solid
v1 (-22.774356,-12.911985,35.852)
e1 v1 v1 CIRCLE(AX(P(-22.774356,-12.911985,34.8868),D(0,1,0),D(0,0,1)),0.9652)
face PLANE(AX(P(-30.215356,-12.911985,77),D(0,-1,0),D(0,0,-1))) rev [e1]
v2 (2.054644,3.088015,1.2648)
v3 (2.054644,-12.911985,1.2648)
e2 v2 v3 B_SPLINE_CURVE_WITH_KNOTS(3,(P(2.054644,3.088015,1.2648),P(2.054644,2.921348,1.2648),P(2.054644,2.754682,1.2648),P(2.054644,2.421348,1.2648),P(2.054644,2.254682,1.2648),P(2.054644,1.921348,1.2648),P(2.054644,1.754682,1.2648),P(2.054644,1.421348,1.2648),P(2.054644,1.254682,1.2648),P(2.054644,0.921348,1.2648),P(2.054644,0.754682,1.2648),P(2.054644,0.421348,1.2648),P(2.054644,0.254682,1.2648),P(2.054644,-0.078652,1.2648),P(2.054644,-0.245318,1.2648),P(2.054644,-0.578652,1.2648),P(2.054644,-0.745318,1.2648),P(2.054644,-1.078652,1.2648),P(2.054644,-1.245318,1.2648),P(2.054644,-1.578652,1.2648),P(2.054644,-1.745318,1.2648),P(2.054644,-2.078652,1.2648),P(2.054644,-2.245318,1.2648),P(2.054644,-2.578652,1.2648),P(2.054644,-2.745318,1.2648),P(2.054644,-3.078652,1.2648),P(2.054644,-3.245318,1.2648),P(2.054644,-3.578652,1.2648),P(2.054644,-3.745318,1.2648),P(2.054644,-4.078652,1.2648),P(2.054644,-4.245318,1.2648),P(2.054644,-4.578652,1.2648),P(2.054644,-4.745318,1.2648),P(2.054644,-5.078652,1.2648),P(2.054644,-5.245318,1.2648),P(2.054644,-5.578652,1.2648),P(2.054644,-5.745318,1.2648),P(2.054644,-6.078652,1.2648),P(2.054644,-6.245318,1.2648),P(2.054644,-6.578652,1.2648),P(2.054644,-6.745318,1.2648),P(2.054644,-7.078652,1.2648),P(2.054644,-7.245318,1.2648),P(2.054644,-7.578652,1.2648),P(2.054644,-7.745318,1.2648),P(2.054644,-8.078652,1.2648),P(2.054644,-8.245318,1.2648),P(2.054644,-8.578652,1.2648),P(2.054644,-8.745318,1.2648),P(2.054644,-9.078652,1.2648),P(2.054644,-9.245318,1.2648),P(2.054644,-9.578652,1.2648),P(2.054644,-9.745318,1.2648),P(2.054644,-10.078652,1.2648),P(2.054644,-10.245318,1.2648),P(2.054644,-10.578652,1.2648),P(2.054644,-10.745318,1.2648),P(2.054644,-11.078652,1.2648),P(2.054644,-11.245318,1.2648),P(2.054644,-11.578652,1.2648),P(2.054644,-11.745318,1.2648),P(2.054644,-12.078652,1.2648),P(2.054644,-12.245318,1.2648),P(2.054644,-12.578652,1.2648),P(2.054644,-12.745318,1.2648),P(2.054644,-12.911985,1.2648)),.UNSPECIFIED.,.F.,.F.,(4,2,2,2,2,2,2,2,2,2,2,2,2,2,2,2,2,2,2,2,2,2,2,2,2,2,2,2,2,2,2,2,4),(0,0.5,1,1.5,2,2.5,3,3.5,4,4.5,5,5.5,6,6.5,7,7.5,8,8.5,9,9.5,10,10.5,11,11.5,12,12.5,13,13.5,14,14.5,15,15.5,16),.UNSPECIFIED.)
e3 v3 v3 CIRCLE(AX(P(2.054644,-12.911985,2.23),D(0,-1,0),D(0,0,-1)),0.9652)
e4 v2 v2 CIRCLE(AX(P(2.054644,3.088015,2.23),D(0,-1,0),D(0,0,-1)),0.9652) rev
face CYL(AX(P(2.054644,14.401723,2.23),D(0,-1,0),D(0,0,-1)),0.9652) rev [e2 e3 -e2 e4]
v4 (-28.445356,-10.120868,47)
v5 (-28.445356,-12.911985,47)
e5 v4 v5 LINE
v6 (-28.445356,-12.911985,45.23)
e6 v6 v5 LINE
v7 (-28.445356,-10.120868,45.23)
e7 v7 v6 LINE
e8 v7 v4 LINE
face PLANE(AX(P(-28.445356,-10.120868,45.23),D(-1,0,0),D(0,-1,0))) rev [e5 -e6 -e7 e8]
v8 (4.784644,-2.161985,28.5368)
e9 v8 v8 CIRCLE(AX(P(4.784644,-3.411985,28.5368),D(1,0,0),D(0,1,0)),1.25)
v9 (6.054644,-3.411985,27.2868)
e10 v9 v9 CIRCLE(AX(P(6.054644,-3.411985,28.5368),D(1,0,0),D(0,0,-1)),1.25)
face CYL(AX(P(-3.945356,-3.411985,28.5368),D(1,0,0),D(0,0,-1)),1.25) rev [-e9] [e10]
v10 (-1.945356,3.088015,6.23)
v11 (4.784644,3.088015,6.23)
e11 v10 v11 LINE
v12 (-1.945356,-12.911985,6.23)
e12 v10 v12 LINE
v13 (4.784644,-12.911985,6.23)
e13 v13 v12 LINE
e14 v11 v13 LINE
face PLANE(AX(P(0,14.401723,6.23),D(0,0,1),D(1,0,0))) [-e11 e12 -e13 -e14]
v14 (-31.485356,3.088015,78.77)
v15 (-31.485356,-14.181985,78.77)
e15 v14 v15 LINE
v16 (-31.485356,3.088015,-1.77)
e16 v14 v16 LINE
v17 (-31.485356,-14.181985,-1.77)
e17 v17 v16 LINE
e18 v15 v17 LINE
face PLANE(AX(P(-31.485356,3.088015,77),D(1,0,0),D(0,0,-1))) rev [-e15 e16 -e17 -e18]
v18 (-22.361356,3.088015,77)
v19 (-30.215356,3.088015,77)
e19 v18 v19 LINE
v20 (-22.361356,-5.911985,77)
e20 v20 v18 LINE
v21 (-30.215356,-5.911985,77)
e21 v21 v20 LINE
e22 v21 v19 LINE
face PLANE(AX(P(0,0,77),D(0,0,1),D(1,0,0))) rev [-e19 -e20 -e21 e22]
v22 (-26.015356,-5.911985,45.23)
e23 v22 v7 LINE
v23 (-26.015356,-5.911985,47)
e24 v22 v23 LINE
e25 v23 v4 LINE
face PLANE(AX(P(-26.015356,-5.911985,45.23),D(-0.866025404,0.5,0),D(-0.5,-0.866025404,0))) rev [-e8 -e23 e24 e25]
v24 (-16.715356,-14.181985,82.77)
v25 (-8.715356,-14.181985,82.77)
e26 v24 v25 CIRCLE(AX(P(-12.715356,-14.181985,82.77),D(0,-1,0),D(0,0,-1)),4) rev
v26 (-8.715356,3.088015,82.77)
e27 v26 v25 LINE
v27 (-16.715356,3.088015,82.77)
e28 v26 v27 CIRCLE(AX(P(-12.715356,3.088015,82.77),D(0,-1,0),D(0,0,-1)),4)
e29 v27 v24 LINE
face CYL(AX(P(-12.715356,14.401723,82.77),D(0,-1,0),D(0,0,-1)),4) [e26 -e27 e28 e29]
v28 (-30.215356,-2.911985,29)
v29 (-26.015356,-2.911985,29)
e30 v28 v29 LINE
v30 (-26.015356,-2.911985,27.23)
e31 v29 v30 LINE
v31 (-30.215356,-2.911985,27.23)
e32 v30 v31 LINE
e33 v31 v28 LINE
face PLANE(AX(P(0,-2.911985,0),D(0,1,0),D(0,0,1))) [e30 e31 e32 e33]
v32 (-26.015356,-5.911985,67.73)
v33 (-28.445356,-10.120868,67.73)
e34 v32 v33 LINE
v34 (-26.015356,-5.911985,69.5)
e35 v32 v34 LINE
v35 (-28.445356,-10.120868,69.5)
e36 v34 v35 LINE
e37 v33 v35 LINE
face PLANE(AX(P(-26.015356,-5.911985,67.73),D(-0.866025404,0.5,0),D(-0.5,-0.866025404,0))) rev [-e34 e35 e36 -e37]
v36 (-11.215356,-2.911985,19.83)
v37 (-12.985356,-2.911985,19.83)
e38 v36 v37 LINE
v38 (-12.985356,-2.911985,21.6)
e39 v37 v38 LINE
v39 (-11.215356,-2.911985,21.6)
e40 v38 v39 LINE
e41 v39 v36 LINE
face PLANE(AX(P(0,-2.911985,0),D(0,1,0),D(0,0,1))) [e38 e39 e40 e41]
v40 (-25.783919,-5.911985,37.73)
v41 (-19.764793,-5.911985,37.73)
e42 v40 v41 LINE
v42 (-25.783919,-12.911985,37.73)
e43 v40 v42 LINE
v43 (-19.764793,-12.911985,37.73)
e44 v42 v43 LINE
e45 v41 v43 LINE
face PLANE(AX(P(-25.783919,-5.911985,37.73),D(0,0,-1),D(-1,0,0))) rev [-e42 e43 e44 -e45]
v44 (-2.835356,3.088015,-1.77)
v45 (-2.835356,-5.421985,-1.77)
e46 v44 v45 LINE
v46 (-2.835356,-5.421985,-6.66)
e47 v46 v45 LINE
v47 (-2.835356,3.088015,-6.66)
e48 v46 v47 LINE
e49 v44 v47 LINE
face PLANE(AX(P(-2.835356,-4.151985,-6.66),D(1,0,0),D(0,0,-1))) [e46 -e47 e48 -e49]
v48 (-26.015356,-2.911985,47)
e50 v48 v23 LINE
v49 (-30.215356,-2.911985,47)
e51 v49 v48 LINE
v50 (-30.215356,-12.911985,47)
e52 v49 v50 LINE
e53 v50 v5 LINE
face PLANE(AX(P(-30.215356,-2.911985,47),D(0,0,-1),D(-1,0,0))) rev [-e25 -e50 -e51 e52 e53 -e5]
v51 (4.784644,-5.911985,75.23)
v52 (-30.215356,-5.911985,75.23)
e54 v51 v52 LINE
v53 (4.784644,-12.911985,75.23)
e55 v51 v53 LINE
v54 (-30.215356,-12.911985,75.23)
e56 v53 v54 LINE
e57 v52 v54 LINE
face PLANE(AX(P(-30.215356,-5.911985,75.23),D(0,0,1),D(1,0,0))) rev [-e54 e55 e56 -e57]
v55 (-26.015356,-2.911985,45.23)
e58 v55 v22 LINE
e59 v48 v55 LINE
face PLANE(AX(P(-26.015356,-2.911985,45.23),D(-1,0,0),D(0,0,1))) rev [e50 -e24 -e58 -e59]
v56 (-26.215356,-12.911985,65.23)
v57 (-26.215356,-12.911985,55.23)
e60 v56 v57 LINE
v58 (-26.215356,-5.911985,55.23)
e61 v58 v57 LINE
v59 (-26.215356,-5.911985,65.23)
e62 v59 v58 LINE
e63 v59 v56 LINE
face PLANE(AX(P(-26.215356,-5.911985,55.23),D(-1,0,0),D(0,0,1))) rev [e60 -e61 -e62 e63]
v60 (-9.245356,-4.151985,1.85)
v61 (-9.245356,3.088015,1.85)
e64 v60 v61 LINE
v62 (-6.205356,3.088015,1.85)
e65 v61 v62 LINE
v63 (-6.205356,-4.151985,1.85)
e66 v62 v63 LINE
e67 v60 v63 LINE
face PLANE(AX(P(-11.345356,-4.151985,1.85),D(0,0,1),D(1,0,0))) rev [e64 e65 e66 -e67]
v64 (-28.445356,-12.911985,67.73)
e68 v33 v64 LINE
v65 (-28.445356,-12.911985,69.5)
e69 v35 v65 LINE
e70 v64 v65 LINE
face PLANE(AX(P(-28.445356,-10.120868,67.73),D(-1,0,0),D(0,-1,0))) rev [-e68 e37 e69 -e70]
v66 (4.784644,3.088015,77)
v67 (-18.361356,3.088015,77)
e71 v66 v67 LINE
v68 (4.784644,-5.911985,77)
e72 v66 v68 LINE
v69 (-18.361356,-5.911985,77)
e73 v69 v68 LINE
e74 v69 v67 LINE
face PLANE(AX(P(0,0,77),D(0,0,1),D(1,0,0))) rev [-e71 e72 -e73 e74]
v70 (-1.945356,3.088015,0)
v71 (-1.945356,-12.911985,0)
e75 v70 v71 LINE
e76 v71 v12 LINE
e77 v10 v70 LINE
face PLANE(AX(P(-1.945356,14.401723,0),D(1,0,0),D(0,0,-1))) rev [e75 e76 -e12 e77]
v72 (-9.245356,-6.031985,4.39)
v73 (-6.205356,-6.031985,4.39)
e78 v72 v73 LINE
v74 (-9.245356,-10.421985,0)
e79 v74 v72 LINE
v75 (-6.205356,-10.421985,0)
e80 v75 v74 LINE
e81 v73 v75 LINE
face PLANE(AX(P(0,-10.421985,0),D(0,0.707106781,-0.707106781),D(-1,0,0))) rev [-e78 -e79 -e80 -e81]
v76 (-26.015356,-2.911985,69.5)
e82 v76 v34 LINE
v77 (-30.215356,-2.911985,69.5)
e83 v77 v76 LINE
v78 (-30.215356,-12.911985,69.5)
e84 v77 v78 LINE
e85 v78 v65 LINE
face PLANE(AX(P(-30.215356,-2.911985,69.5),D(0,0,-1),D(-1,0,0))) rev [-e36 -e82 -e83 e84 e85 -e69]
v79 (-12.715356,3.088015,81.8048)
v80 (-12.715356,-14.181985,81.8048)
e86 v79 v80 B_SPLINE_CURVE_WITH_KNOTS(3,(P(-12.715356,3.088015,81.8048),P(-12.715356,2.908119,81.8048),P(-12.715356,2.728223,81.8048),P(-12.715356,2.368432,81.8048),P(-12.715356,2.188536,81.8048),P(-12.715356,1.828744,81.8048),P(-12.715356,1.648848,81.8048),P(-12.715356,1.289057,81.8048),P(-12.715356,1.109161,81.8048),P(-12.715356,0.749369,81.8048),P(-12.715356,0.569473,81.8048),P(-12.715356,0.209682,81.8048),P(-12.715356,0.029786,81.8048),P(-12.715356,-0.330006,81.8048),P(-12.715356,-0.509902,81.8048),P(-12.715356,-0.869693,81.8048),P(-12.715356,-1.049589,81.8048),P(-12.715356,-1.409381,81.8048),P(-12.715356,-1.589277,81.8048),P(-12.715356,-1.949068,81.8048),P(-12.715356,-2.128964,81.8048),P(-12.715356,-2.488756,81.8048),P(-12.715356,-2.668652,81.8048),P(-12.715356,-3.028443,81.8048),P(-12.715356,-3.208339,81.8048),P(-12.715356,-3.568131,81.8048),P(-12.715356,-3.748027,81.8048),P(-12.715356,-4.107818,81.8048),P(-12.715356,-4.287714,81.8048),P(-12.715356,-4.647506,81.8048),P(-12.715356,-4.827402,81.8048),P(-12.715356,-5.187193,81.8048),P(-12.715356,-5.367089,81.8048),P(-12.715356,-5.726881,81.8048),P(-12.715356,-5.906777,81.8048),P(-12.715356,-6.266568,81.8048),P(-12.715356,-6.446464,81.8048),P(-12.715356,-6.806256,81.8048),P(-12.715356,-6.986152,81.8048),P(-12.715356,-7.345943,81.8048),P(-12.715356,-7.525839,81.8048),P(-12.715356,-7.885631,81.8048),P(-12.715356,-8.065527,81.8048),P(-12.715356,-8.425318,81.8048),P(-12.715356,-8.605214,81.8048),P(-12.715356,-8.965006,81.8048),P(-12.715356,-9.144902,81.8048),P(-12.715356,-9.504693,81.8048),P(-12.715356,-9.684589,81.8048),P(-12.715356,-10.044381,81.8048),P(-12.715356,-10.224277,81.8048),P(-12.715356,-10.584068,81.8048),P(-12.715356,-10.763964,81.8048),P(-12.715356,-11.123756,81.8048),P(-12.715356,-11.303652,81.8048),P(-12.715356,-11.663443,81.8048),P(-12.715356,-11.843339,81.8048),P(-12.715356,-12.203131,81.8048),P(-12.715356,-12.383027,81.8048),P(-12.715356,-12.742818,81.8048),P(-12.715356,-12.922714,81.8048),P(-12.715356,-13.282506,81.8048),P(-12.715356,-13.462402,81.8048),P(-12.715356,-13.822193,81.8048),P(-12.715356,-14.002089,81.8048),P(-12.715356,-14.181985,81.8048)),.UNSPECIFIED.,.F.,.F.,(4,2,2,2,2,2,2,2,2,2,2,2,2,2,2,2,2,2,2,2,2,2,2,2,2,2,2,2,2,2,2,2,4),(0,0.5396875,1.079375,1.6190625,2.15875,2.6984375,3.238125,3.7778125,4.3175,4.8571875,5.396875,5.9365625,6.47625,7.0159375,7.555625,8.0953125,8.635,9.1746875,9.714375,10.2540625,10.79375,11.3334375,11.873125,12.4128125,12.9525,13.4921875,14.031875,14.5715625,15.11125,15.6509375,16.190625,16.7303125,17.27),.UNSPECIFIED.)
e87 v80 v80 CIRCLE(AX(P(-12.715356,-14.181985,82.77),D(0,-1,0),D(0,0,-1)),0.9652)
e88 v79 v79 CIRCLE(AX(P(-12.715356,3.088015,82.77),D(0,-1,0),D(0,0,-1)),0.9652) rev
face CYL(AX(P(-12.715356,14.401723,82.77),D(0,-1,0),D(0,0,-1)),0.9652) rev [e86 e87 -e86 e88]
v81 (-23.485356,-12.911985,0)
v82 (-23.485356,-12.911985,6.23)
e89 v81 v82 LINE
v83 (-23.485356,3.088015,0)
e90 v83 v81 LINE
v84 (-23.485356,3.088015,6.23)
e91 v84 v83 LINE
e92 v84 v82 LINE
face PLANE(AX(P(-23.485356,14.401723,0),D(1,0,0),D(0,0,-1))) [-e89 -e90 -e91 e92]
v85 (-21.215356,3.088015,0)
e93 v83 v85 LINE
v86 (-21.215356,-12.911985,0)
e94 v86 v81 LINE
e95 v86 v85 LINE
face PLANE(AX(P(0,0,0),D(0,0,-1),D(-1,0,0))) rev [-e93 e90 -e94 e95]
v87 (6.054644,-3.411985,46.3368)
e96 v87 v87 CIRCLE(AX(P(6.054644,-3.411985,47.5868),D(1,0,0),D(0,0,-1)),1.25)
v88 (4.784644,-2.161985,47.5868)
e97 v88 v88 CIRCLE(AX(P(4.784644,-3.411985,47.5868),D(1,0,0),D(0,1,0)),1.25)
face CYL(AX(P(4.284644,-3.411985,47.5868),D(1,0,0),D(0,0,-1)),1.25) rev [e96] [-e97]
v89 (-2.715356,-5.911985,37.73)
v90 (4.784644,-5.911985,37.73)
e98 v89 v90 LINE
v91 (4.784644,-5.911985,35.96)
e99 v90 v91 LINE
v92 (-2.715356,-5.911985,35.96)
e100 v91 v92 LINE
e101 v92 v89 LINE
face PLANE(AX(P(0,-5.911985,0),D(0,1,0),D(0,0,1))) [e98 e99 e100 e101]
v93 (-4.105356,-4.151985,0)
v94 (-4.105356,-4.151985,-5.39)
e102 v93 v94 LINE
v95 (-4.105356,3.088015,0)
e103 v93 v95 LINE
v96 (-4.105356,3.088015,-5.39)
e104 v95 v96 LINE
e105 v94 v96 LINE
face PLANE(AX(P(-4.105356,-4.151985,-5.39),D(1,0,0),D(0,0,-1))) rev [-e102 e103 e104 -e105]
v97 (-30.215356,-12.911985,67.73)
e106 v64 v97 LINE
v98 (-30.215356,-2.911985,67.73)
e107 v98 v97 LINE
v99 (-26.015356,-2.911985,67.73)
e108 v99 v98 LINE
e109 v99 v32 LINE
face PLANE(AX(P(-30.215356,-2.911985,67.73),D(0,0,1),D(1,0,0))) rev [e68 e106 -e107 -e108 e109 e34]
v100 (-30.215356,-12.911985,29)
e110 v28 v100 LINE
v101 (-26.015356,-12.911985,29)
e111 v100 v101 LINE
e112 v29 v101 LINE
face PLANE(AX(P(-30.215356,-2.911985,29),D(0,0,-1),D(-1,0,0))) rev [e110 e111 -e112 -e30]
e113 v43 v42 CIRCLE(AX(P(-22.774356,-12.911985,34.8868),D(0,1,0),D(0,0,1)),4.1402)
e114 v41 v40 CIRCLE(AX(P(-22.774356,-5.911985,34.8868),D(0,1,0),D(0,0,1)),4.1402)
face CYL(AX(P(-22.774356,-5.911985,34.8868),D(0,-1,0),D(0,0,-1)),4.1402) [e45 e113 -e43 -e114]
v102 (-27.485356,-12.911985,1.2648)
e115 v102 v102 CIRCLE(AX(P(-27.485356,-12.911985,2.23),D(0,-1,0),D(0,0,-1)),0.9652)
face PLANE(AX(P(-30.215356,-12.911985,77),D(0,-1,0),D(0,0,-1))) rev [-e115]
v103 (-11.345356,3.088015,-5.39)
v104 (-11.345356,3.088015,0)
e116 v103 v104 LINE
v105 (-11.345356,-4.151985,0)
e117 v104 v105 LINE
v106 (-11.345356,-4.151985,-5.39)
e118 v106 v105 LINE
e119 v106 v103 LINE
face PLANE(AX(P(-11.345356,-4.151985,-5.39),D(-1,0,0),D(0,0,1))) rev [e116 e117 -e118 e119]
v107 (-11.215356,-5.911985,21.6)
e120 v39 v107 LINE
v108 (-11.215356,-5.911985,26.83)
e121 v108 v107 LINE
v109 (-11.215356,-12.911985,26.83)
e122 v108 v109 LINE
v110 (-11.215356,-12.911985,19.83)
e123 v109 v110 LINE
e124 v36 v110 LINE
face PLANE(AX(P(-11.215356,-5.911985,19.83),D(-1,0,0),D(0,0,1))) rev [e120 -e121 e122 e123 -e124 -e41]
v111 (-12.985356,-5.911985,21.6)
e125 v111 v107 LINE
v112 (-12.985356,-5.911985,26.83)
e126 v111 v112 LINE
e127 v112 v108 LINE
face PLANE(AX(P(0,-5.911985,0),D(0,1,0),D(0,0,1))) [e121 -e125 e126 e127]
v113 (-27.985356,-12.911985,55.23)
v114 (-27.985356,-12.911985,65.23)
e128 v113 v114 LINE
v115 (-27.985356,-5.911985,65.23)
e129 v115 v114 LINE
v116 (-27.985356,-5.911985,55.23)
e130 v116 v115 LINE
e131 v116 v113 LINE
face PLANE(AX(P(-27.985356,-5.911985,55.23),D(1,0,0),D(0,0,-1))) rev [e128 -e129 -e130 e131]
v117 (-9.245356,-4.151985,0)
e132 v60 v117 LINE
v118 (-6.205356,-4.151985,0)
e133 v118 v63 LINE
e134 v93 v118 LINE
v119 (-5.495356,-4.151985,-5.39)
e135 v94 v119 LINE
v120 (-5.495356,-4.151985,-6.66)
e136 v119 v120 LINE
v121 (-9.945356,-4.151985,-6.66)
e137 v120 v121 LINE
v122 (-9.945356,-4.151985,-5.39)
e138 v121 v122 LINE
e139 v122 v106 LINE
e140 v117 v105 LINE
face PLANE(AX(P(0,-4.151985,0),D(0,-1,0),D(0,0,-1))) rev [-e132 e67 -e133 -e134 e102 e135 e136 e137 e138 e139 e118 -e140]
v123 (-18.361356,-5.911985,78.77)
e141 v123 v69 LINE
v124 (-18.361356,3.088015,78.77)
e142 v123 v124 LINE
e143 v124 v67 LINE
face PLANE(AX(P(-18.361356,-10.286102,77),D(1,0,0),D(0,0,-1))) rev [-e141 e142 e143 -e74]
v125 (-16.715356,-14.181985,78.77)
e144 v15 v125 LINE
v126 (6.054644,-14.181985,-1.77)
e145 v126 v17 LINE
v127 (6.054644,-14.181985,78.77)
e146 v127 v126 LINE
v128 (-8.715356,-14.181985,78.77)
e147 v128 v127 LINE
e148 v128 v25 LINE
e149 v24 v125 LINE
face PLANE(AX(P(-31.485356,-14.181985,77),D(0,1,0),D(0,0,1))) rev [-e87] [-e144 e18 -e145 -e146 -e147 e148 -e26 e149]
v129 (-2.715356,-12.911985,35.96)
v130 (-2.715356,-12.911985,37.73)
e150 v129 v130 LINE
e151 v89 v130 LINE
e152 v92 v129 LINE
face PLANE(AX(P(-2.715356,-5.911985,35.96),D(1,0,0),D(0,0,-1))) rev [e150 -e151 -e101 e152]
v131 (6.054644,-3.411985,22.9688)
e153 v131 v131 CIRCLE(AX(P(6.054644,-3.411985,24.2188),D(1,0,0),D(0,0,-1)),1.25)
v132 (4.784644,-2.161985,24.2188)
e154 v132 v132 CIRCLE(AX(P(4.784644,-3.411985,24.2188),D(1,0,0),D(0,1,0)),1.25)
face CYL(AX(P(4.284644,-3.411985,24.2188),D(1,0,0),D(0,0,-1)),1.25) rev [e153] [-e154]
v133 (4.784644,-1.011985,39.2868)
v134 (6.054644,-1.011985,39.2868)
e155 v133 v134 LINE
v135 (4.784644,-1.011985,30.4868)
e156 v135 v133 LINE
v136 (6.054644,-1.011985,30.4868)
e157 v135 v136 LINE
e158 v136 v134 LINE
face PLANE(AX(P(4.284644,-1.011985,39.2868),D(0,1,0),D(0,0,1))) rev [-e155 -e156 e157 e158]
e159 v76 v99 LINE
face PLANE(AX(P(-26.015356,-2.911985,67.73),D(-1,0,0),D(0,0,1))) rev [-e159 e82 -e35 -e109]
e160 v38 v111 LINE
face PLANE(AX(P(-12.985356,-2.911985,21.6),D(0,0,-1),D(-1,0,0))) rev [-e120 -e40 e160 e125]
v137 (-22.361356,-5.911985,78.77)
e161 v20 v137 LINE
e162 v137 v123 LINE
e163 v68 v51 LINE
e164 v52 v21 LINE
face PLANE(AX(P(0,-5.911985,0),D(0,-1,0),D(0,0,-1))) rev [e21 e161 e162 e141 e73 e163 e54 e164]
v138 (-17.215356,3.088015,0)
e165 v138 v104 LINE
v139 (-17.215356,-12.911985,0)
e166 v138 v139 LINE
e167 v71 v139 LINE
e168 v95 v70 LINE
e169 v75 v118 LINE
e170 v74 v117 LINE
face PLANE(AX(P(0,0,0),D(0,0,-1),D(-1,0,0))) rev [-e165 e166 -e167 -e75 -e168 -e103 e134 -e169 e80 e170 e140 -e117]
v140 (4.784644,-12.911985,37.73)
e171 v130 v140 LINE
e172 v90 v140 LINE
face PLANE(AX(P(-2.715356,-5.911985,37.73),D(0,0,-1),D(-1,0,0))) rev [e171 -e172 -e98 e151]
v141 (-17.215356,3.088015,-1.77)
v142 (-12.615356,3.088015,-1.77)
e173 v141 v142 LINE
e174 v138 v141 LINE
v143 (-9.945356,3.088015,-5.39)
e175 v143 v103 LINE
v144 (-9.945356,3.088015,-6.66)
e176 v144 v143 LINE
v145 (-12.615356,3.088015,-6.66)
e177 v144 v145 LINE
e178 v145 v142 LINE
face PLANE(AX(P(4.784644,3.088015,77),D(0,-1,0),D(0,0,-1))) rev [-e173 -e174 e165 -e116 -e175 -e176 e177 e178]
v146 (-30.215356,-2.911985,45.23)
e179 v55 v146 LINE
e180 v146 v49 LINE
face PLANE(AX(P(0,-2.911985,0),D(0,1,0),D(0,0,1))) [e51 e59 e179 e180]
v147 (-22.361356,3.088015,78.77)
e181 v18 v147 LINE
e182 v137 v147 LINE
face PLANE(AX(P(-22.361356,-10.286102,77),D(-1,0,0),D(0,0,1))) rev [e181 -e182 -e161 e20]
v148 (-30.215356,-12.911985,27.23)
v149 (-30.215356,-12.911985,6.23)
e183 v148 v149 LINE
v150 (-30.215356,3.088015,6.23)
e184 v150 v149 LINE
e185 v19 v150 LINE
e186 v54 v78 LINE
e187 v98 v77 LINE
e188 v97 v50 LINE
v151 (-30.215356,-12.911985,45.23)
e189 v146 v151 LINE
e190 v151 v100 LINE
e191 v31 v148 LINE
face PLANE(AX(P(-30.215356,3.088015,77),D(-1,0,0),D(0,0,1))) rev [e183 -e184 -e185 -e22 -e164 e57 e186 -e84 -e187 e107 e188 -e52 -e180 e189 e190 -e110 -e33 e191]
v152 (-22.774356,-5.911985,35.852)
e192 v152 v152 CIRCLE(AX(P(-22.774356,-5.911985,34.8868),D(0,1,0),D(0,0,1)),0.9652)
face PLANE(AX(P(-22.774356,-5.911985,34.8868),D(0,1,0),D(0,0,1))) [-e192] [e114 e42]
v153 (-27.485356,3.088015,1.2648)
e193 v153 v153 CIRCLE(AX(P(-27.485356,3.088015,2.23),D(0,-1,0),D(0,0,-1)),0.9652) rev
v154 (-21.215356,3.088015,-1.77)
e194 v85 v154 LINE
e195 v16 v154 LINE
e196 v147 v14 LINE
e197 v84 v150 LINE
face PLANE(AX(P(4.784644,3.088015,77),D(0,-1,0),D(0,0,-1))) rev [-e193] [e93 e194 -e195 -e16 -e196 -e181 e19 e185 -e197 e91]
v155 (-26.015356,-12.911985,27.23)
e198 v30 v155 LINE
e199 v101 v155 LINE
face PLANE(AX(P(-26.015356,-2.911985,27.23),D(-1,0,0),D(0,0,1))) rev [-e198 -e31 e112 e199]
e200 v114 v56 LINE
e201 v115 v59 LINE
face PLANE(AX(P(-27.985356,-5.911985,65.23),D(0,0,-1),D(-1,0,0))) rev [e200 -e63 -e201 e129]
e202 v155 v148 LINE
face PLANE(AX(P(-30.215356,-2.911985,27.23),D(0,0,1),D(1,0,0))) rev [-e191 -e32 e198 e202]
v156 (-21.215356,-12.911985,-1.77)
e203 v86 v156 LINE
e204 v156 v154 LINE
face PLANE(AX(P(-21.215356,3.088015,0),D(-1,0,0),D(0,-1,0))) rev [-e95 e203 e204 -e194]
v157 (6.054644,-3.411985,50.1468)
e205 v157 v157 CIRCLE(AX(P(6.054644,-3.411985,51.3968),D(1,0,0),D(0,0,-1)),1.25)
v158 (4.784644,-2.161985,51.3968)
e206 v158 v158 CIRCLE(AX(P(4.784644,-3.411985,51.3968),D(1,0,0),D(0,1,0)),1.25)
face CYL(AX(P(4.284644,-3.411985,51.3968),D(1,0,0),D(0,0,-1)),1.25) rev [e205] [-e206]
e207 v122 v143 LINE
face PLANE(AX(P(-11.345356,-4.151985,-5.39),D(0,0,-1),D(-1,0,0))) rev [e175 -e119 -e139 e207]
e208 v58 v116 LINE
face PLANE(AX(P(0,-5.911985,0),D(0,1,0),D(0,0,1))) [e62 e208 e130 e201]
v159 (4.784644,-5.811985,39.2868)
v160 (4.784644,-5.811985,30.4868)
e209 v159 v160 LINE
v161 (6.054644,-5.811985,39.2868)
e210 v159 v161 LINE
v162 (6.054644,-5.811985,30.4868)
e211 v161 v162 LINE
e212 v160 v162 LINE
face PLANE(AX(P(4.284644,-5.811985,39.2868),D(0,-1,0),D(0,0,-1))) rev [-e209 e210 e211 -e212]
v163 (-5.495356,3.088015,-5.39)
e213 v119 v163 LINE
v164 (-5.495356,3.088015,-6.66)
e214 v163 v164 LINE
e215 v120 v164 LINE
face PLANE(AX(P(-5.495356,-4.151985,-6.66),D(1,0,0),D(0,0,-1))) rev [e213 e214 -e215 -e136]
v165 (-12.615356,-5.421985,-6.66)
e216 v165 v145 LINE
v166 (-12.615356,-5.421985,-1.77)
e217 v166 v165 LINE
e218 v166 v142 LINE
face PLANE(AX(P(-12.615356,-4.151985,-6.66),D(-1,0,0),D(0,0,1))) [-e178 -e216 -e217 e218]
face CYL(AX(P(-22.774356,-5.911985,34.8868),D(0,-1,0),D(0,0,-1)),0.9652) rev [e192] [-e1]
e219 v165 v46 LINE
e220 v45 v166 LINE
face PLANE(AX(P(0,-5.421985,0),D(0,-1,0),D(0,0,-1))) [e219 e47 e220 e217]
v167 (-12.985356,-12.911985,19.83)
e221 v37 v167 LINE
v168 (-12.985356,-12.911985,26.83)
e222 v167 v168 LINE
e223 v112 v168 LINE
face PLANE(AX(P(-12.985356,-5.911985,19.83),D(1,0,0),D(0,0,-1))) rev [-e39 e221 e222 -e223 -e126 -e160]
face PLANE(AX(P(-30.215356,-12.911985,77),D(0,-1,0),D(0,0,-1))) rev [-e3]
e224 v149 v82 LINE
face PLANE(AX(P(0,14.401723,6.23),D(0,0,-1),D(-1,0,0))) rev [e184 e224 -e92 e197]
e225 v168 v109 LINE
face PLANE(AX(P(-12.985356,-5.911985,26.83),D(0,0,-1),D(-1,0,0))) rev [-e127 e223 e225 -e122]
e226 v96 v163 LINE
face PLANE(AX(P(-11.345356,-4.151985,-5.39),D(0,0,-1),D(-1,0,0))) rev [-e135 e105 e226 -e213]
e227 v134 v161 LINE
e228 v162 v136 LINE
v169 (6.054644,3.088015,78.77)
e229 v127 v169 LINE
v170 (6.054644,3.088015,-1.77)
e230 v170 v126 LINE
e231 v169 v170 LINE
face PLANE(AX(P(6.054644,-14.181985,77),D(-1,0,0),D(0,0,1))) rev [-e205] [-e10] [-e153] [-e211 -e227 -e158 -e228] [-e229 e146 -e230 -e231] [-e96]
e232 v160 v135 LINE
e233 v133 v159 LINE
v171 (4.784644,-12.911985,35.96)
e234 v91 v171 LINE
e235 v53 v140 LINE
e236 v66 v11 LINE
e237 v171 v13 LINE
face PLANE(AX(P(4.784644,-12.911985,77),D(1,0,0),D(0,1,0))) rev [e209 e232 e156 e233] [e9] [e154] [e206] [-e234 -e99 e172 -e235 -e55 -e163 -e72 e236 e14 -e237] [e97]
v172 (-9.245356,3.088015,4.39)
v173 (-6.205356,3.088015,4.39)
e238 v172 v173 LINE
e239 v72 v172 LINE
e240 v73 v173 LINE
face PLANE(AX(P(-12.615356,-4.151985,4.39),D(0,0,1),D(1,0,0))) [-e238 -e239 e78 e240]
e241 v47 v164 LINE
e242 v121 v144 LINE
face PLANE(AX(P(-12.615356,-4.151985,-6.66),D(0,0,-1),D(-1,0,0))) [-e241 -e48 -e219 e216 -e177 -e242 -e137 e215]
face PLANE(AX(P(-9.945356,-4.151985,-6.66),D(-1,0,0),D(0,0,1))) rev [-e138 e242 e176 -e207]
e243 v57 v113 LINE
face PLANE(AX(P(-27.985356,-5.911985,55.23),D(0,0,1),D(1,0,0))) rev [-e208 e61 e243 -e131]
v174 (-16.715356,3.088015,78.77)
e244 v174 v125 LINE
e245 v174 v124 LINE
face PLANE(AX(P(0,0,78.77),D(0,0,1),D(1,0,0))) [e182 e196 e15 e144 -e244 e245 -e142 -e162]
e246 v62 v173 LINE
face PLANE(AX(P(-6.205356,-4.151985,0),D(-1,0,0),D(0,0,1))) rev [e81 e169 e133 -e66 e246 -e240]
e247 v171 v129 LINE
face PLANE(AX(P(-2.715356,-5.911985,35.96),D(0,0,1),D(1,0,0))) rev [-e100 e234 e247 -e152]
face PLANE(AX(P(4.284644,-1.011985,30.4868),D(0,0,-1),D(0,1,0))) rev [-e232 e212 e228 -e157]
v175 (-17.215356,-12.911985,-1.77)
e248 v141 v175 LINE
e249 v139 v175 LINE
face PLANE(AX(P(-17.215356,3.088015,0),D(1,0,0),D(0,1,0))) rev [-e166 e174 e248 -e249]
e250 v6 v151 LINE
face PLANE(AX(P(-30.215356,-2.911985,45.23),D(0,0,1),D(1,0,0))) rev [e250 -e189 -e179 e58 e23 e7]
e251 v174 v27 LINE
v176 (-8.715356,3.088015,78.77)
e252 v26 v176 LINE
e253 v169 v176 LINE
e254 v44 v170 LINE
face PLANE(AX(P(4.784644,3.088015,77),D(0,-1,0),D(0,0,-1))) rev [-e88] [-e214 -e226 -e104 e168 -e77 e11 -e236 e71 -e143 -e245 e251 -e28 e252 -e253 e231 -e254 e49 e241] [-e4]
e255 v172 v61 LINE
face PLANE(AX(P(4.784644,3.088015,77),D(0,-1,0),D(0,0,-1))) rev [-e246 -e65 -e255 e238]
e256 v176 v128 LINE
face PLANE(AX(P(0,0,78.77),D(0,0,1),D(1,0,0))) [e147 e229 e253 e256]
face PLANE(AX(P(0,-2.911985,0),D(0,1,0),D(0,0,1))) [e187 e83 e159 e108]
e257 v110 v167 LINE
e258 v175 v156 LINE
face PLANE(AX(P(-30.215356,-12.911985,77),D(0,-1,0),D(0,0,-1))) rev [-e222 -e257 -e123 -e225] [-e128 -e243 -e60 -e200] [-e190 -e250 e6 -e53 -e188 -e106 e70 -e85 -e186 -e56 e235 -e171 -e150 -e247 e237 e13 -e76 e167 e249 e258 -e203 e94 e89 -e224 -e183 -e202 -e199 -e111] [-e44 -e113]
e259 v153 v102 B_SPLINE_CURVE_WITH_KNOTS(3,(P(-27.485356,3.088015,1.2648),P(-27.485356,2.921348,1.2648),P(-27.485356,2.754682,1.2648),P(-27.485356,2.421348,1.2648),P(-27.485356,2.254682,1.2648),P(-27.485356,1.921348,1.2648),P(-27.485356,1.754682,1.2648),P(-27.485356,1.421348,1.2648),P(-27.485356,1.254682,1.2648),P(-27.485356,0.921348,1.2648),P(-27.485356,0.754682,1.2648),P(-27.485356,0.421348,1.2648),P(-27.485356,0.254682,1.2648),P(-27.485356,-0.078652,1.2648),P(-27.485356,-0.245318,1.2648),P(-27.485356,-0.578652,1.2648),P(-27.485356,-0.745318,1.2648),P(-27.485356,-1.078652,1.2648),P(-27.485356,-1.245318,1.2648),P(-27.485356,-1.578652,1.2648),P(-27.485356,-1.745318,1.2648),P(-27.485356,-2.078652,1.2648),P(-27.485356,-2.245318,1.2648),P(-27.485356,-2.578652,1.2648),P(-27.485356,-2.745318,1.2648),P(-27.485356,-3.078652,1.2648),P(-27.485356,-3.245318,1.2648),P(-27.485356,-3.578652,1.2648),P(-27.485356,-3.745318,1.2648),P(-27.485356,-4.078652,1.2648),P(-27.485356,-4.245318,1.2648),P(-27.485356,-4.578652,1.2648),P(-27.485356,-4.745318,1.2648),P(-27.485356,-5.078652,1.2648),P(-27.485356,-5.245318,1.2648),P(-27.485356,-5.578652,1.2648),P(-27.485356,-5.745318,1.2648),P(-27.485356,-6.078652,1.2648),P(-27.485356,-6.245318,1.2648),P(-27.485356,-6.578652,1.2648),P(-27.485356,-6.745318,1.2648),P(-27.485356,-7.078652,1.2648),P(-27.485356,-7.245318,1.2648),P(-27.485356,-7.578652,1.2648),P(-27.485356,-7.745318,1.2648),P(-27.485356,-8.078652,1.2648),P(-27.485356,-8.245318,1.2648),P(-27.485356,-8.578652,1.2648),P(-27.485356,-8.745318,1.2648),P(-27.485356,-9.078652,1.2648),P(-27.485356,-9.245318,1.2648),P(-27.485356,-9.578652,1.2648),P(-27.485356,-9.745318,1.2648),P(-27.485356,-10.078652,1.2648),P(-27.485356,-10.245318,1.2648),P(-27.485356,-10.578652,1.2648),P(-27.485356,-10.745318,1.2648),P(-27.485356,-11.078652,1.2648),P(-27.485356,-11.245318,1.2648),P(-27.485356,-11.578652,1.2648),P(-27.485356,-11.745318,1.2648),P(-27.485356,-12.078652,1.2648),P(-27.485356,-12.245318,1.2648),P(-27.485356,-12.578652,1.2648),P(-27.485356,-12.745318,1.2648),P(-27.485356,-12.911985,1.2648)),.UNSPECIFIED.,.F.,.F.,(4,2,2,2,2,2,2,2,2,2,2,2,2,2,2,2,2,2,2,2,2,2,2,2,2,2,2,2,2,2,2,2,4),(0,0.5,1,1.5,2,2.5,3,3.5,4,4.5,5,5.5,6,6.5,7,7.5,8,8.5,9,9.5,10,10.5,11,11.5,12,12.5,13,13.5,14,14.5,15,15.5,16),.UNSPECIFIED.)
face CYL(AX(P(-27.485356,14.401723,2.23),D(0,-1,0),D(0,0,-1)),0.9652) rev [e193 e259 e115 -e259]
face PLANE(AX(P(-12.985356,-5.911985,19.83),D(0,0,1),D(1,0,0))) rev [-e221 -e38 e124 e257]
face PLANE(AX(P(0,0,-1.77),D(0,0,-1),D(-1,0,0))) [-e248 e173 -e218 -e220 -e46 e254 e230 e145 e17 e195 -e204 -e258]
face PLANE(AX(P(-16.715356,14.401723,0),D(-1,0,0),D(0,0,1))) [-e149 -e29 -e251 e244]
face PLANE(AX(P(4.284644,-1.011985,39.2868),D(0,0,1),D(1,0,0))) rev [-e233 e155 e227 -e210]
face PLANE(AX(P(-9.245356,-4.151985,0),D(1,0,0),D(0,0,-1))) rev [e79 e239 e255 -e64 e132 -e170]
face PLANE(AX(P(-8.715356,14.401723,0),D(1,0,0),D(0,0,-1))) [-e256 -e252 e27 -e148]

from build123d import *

# Parameters (mm, degrees)
BOSS_EXTRUDE1_DEPTH            = 77
SKETCH3_W                      = 37.54
SKETCH3_H                      = 17.27
BOSS_EXTRUDE2_DEPTH            = 1.77
SKETCH4_W                      = 37.54
SKETCH4_H                      = 17.27
BOSS_EXTRUDE3_DEPTH            = 1.77
SKETCH5_W                      = 4
SKETCH5_H                      = 16
CUT_EXTRUDE2_DEPTH             = 1.77
SKETCH6_W                      = 9.78
SKETCH6_H                      = 11.05
SKETCH6_W_2                    = 7.24
SKETCH6_H_2                    = 7.24
BUTTON_WALLS_DEPTH             = 7.24
SKETCH7_W                      = 9.78
SKETCH7_H                      = 11.05
BUTTON_BOTTOM_DEPTH            = 1.27
SKETCH8_W                      = 7.24
SKETCH8_H                      = 1.77
BUTTON_CUTOUT_MIDDLE_DEPTH     = 7.24
SKETCH9_W                      = 4.45
SKETCH9_H                      = 1.27
SKETCH9_W_2                    = 3.37
SKETCH9_H_2                    = 4.39
BUTTON_CUTOUT_FRONT_BACK_DEPTH = 7.24
SKETCH10_W                     = 3.37
SKETCH10_H                     = 4.39
BUTTON_CUTOUT_BOTTOM_DEPTH     = 1.27
BUTTON_CHAMFER1_SIZE           = 5
SKETCH12_W                     = 35
SKETCH12_H                     = 1.77
SKETCH12_W_2                   = 1.77
SKETCH12_H_2                   = 10
SKETCH12_W_3                   = 7.5
SKETCH12_R                     = 0.9652
SKETCH12_H_3                   = 7
SUPPORT_PCB_BATTERY_DEPTH      = 7
SKETCH13_R                     = 1.25
SKETCH13_W                     = 8.8
SKETCH13_H                     = 4.8
CUTOUT_USB_3_LEDS_DEPTH        = 1.77
SKETCH16_W                     = 1.77
SKETCH16_H                     = 1.77
TAB_PCB_RETAINER_LEN_DEPTH     = 3
SKETCH17_W                     = 4
SKETCH17_H                     = 1.77
CUTOUT_BACK_MOT_WIRES_DEPTH    = 9
SKETCH18_R                     = 1.25
CUTOUT_CHG_DONE_LED_DEPTH      = 10
SKETCH19_W                     = 4.2
SKETCH19_H                     = 1.77
TAB_PCB_RETAINERS_WIDTH_DEPTH  = 10
CUTOUT_RETAINER_TAB_1_DEPTH    = 1.77
CUTOUT_RETAINER_TAB_2_DEPTH    = 1.77
SKETCH23_W                     = 8
SKETCH23_H                     = 8
SKETCH23_R                     = 0.9652
CASING_SCREW_POSTS_DEPTH       = 17.27


with BuildPart() as part:
    # Sketch2 → Boss-Extrude1 (new body)
    with BuildSketch(Plane.XY):
        Polygon((-30.215355805, 3.088014981), (-30.215355805, -12.911985019), (4.784644195, -12.911985019), (4.784644195, 3.088014981), (6.054644195, 3.088014981), (6.054644195, -14.181985019), (-31.485355805, -14.181985019), (-31.485355805, 3.088014981), align=None)
    extrude(amount=BOSS_EXTRUDE1_DEPTH)

    # Sketch3 → Boss-Extrude2 (add)
    with BuildSketch(Plane.XY.offset(77)):
        with Locations((-12.715355805, -5.546985019)):
            Rectangle(SKETCH3_W, SKETCH3_H)
    extrude(amount=BOSS_EXTRUDE2_DEPTH)

    # Sketch4 → Boss-Extrude3 (add)
    with BuildSketch(Plane(origin=(0, 0, 0), x_dir=(-1, 0, 0), z_dir=(0, 0, -1))):
        with Locations((12.715355805, -5.546985019)):
            Rectangle(SKETCH4_W, SKETCH4_H)
    extrude(amount=BOSS_EXTRUDE3_DEPTH)

    # Sketch5 → Cut-Extrude2 (cut)
    with BuildSketch(Plane(origin=(0, 0, -1.77), x_dir=(-1, 0, 0), z_dir=(0, 0, -1))):
        with Locations((19.215355805, -4.911985019)):
            Rectangle(SKETCH5_W, SKETCH5_H)
    extrude(amount=-CUT_EXTRUDE2_DEPTH, mode=Mode.SUBTRACT)

    # Sketch6 → button_walls (add)
    with BuildSketch(Plane(origin=(0, 3.088014981, 0), x_dir=(1, 0, 0), z_dir=(0, 1, 0))):
        with Locations((-7.725355805, 1.135)):
            Rectangle(SKETCH6_W, SKETCH6_H)
        with Locations((-7.725355805, 1.77)):
            Rectangle(SKETCH6_W_2, SKETCH6_H_2, mode=Mode.SUBTRACT)
    extrude(amount=-BUTTON_WALLS_DEPTH)

    # Sketch7 → button_bottom (add)
    with BuildSketch(Plane.XZ.offset(4.151985019)):
        with Locations((-7.725355805, -1.135)):
            Rectangle(SKETCH7_W, SKETCH7_H)
    extrude(amount=BUTTON_BOTTOM_DEPTH)

    # Sketch8 → button_cutout_middle (cut)
    with BuildSketch(Plane(origin=(0, 3.088014981, 0), x_dir=(1, 0, 0), z_dir=(0, 1, 0))):
        with Locations((-7.725355805, 0.885)):
            Rectangle(SKETCH8_W, SKETCH8_H)
    extrude(amount=-BUTTON_CUTOUT_MIDDLE_DEPTH, mode=Mode.SUBTRACT)

    # Sketch9 → button_cutout_front_back (cut)
    with BuildSketch(Plane(origin=(0, 3.088014981, 0), x_dir=(1, 0, 0), z_dir=(0, 1, 0))):
        with Locations((-7.720355805, 6.025)):
            Rectangle(SKETCH9_W, SKETCH9_H)
        with Locations((-10.930355805, -2.195)):
            Rectangle(SKETCH9_W_2, SKETCH9_H_2)
        with Locations((-4.520355805, -2.195)):
            Rectangle(SKETCH9_W_2, SKETCH9_H_2)
    extrude(amount=-BUTTON_CUTOUT_FRONT_BACK_DEPTH, mode=Mode.SUBTRACT)

    # Sketch10 → button_cutout_bottom (cut)
    with BuildSketch(Plane(origin=(0, -4.151985019, 0), x_dir=(1, 0, 0), z_dir=(0, 1, 0))):
        with Locations((-10.930355805, -2.195)):
            Rectangle(SKETCH10_W, SKETCH10_H)
        with Locations((-4.520355805, -2.195)):
            Rectangle(SKETCH10_W, SKETCH10_H)
    extrude(amount=-BUTTON_CUTOUT_BOTTOM_DEPTH, mode=Mode.SUBTRACT)

    # button_Chamfer1
    # the kernel refuses this chamfer: 5 mm, written as the material it adds along each edge
    with BuildSketch(Plane(origin=(-6.205355805, -5.421985019, 0), x_dir=(0, -0.9996219169112968, -0.027495876610586372), z_dir=(-1, 0, 0))) as button_chamfer1_piece_1_section:
        Polygon((BUTTON_CHAMFER1_SIZE * 0.999621916911, BUTTON_CHAMFER1_SIZE * 0.0274958766106), (-BUTTON_CHAMFER1_SIZE * 0.0274958766106, BUTTON_CHAMFER1_SIZE * 0.999621916911), (0, 0), align=None)
    button_chamfer1_piece_1 = extrude(amount=3.04, mode=Mode.PRIVATE)
    button_chamfer1_piece_1 = split(button_chamfer1_piece_1, bisect_by=Plane(origin=(-7.725355805, -7.110612501, 4.39), z_dir=(0, 0, -1)), keep=Keep.TOP, mode=Mode.PRIVATE)
    add(button_chamfer1_piece_1)

    # Sketch12 → support_pcb_battery (add)
    # profile 1 of 5: a face of its own
    with BuildSketch(Plane(origin=(0, -12.911985019, 0), x_dir=(1, 0, 0), z_dir=(0, 1, 0))):
        with Locations((-12.715355805, -76.115)):
            Rectangle(SKETCH12_W, SKETCH12_H)
    # profile 2 of 5: a face of its own
    with BuildSketch(Plane(origin=(0, -12.911985019, 0), x_dir=(1, 0, 0), z_dir=(0, 1, 0))):
        with Locations((-27.100355805, -60.23)):
            Rectangle(SKETCH12_W_2, SKETCH12_H_2)
    # profile 3 of 5: a face of its own
    with BuildSketch(Plane(origin=(0, -12.911985019, 0), x_dir=(1, 0, 0), z_dir=(0, 1, 0))):
        with Locations((1.034644195, -36.845)):
            Rectangle(SKETCH12_W_3, SKETCH12_H)
    # profile 4 of 5: a face of its own
    with BuildSketch(Plane(origin=(0, -12.911985019, 0), x_dir=(1, 0, 0), z_dir=(0, 1, 0))):
        with BuildLine():
            Line((-25.783918863, -37.73), (-19.764792747, -37.73))
            ThreePointArc((-19.764792747, -37.73), (-22.774355805, -30.7466), (-25.783918863, -37.73))
        make_face()
        with Locations(Location((-22.774355805, -34.8868, 0), (0, 0, 270))):
            Circle(SKETCH12_R, mode=Mode.SUBTRACT)
    # profile 5 of 5: a face of its own
    with BuildSketch(Plane(origin=(0, -12.911985019, 0), x_dir=(1, 0, 0), z_dir=(0, 1, 0))):
        with Locations((-12.100355805, -23.33)):
            Rectangle(SKETCH12_W_2, SKETCH12_H_3)
    extrude(amount=SUPPORT_PCB_BATTERY_DEPTH)

    # Sketch13 → cutout_usb_3_leds (cut)
    with BuildSketch(Plane(origin=(6.054644195, 0, 0), x_dir=(0, 0, -1), z_dir=(1, 0, 0))):
        with Locations((-51.3968, -3.411985019)):
            Circle(SKETCH13_R)
        with Locations((-47.5868, -3.411985019)):
            Circle(SKETCH13_R)
        with Locations((-24.2188, -3.411985019)):
            Circle(SKETCH13_R)
        with Locations((-34.8868, -3.411985019)):
            Rectangle(SKETCH13_W, SKETCH13_H)
    extrude(amount=-CUTOUT_USB_3_LEDS_DEPTH, mode=Mode.SUBTRACT)

    # Sketch16 → tab_pcb_retainer_len (add)
    with BuildSketch(Plane(origin=(0, -5.911985019, 0), x_dir=(1, 0, 0), z_dir=(0, 1, 0))):
        with Locations((-12.100355805, -20.715)):
            Rectangle(SKETCH16_W, SKETCH16_H)
    extrude(amount=TAB_PCB_RETAINER_LEN_DEPTH)

    # Sketch17 → cutout_back_mot_wires (cut)
    with BuildSketch(Plane(origin=(0, 3.088014981, 0), x_dir=(1, 0, 0), z_dir=(0, 1, 0))):
        with Locations((-20.361355805, -77.885)):
            Rectangle(SKETCH17_W, SKETCH17_H)
    extrude(amount=-CUTOUT_BACK_MOT_WIRES_DEPTH, mode=Mode.SUBTRACT)

    # Sketch18 → cutout_chg_done_led (cut)
    with BuildSketch(Plane(origin=(6.054644195, 0, 0), x_dir=(0, 0, -1), z_dir=(1, 0, 0))):
        with Locations((-28.5368, -3.411985019)):
            Circle(SKETCH18_R)
    extrude(amount=-CUTOUT_CHG_DONE_LED_DEPTH, mode=Mode.SUBTRACT)

    # Sketch19 → tab_pcb_retainers_width (add)
    with BuildSketch(Plane(origin=(0, -12.911985019, 0), x_dir=(1, 0, 0), z_dir=(0, 1, 0))):
        with Locations((-28.115355805, -68.615)):
            Rectangle(SKETCH19_W, SKETCH19_H)
        with Locations((-28.115355805, -46.115)):
            Rectangle(SKETCH19_W, SKETCH19_H)
        with Locations((-28.115355805, -28.115)):
            Rectangle(SKETCH19_W, SKETCH19_H)
    extrude(amount=TAB_PCB_RETAINERS_WIDTH_DEPTH)

    # Sketch20 → cutout_retainer_tab_1 (cut)
    with BuildSketch(Plane.XY.offset(69.5)):
        Polygon((-26.015355805, -12.911985019), (-26.015355805, -5.911985019), (-28.445355805, -10.120868481), (-28.445355805, -12.911985019), align=None)
    extrude(amount=-CUTOUT_RETAINER_TAB_1_DEPTH, mode=Mode.SUBTRACT)

    # Sketch21 → cutout_retainer_tab_2 (cut)
    with BuildSketch(Plane.XY.offset(47)):
        Polygon((-26.015355805, -5.911985019), (-28.445355805, -10.120868481), (-28.445355805, -12.911985019), (-26.015355805, -12.911985019), align=None)
    extrude(amount=-CUTOUT_RETAINER_TAB_2_DEPTH, mode=Mode.SUBTRACT)

    # Sketch23 → casing_screw_posts (add)
    # profile 1 of 3: a face of its own
    with BuildSketch(Plane.XZ.offset(14.181985019)):
        with Locations((2.054644195, 2.23)):
            Rectangle(SKETCH23_W, SKETCH23_H)
        with Locations(Location((2.054644195, 2.23, 0), (0, 0, 270))):
            Circle(SKETCH23_R, mode=Mode.SUBTRACT)
    # profile 2 of 3: a face of its own
    with BuildSketch(Plane.XZ.offset(14.181985019)):
        with Locations((-27.485355805, 2.23)):
            Rectangle(SKETCH23_W, SKETCH23_H)
        with Locations(Location((-27.485355805, 2.23, 0), (0, 0, 270))):
            Circle(SKETCH23_R, mode=Mode.SUBTRACT)
    # profile 3 of 3: a face of its own
    with BuildSketch(Plane.XZ.offset(14.181985019)):
        with BuildLine():
            Line((-16.715355805, 82.77), (-16.715355805, 78.77))
            Line((-16.715355805, 78.77), (-8.715355805, 78.77))
            Line((-8.715355805, 78.77), (-8.715355805, 82.77))
            ThreePointArc((-8.715355805, 82.77), (-12.715355805, 86.77), (-16.715355805, 82.77))
        make_face()
        with Locations(Location((-12.715355805, 82.77, 0), (0, 0, 270))):
            Circle(SKETCH23_R, mode=Mode.SUBTRACT)
    extrude(amount=-CASING_SCREW_POSTS_DEPTH)


solid = part.part
